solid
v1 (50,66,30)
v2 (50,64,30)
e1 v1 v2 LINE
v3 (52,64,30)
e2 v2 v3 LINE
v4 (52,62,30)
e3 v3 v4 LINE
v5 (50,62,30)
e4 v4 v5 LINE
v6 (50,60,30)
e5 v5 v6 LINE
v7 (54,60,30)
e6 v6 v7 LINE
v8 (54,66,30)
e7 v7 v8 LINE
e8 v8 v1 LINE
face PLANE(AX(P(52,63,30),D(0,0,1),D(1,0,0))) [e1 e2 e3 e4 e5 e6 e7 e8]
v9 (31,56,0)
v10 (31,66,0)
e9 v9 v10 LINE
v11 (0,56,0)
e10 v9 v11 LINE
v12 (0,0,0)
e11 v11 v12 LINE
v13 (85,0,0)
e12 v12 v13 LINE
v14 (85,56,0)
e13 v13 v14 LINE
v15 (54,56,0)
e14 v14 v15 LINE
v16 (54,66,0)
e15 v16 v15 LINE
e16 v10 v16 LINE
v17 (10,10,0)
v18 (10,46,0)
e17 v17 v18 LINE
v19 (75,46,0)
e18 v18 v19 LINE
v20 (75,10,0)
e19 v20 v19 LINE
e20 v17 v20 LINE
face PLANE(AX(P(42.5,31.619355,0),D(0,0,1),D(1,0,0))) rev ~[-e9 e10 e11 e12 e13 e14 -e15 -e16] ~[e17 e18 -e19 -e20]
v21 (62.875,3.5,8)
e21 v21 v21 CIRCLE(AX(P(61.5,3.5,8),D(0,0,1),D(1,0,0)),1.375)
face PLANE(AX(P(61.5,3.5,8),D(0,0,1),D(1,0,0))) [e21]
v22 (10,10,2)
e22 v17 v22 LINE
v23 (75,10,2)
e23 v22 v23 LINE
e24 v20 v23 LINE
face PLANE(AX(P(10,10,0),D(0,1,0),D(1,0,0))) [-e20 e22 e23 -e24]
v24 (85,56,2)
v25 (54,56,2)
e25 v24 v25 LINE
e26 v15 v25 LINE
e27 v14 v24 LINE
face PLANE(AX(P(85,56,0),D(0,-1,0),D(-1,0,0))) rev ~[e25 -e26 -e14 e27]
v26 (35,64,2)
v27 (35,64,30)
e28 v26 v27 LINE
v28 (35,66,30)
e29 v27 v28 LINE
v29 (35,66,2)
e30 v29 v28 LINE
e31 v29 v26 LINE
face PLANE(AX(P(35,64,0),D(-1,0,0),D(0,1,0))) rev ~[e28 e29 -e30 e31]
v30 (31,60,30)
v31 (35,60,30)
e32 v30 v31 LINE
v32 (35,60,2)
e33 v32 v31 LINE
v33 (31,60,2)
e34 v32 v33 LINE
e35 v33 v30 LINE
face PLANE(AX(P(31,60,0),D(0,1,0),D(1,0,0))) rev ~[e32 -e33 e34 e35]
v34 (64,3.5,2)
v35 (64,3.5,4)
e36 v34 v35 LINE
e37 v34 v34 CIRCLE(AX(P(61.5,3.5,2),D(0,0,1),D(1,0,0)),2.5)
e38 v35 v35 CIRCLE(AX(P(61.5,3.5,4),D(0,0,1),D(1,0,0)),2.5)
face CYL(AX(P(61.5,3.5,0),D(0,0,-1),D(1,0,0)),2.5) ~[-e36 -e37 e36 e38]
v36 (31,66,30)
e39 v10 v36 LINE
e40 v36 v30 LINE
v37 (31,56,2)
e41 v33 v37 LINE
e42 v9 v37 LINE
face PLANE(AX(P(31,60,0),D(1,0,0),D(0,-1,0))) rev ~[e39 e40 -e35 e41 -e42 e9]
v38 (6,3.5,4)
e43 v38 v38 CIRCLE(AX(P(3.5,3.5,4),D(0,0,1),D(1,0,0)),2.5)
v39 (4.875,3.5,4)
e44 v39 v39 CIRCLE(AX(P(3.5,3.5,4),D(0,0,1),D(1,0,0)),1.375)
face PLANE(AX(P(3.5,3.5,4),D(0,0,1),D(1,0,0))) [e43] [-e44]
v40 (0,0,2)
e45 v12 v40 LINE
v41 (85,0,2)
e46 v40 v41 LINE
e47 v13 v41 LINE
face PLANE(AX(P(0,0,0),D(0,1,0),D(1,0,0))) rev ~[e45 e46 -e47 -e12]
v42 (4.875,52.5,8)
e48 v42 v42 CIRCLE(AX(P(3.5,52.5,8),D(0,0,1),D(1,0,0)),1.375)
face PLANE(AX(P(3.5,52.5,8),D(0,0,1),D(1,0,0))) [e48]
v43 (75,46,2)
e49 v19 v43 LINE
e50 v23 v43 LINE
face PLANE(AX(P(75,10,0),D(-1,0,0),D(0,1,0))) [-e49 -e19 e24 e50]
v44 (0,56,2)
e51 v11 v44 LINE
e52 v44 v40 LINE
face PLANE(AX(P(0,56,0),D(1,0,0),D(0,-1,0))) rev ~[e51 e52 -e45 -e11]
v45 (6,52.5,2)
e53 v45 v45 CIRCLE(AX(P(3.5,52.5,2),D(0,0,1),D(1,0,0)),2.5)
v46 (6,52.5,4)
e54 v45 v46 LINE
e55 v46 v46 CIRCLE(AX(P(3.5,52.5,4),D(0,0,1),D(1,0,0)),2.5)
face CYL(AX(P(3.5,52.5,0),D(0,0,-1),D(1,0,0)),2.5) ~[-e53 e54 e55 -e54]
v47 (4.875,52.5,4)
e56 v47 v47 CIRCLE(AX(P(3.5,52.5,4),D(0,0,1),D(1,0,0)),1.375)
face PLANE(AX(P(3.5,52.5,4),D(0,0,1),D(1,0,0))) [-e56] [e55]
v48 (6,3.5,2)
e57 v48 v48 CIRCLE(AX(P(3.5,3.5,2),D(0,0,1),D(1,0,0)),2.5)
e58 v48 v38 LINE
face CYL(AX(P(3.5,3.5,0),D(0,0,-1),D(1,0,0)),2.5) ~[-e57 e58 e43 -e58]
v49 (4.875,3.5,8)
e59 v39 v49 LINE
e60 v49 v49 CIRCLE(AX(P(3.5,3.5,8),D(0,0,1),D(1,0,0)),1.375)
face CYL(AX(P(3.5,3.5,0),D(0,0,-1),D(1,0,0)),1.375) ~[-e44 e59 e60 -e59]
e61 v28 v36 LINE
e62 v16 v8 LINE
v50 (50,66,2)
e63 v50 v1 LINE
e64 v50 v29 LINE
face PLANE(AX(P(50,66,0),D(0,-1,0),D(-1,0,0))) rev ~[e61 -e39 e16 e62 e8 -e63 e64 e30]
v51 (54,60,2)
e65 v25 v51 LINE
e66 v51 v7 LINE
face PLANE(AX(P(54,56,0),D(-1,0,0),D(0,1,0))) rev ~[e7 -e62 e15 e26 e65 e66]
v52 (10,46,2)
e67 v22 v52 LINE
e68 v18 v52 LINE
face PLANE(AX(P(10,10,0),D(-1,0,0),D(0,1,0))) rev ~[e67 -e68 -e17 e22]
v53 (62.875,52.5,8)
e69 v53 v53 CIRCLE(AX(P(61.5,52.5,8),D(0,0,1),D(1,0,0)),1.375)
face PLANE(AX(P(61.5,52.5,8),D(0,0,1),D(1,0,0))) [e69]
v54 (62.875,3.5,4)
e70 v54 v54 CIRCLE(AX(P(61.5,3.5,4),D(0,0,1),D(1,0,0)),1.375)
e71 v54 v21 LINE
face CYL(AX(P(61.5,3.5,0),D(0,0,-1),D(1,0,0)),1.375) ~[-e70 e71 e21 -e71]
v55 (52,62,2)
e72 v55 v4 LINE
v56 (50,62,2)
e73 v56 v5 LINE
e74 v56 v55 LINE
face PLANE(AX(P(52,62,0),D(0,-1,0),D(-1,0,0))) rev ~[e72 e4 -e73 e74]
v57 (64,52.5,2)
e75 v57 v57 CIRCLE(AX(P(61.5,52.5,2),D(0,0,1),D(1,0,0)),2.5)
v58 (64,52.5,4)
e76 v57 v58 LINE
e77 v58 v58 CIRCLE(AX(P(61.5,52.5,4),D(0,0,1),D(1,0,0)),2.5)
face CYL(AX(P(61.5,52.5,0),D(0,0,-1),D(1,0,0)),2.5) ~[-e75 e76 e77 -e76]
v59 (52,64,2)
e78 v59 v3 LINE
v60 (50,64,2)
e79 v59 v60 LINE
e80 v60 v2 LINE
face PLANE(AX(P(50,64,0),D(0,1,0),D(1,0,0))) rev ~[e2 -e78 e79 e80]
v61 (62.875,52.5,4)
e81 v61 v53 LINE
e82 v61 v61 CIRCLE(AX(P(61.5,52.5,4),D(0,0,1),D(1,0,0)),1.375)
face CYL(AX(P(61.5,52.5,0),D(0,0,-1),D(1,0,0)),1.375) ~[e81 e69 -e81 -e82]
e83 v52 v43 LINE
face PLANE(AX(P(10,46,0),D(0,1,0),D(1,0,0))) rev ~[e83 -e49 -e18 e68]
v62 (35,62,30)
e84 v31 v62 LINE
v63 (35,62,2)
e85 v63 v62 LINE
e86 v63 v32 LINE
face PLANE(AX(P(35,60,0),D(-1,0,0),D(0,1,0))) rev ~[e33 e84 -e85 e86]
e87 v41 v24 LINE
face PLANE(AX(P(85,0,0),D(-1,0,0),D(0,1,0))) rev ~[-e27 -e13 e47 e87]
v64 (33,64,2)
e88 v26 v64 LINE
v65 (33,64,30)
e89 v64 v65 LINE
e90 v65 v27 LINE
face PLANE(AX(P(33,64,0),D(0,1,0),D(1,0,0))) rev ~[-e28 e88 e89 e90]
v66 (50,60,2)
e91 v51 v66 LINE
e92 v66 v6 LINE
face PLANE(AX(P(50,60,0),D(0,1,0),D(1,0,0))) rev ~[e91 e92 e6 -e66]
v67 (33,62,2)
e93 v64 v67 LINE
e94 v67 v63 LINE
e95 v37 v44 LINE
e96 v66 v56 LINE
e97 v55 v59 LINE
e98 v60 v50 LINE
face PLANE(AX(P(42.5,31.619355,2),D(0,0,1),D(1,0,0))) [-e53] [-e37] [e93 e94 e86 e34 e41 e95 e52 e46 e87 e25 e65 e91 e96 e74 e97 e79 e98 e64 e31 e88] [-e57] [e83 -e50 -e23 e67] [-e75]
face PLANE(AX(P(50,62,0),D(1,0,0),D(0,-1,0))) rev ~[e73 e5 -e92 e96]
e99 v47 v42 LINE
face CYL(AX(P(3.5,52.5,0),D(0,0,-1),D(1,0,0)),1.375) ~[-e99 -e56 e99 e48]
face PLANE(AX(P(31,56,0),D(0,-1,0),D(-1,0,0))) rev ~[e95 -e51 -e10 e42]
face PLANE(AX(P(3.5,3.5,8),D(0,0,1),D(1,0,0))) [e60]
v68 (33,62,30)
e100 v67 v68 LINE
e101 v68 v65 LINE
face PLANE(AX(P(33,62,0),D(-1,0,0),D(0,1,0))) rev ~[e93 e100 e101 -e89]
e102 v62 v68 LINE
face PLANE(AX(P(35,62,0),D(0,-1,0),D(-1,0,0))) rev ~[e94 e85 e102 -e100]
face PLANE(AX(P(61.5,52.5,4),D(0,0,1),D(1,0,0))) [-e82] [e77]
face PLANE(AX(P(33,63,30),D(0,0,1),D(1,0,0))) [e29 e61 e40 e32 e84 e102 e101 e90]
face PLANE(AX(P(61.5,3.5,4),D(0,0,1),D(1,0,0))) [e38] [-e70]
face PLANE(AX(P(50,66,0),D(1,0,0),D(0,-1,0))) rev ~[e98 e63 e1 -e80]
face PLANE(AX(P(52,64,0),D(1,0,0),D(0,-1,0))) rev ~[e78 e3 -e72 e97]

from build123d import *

# Parameters (mm, degrees)
F1_DEPTH = 30
F0_R     = 2.5
F0_R_2   = 1.375
F2_DEPTH = 4
F3_DEPTH = 8
F0_W     = 65
F0_H     = 36
F4_DEPTH = 2


with BuildPart() as f1:
    # F0 (on Top) → F1 (new body)
    with BuildSketch(Plane.XY):
        Polygon((31, 66), (31, 60), (35, 60), (35, 62), (33, 62), (33, 64), (35, 64), (35, 66), align=None)
    extrude(amount=F1_DEPTH)



with BuildPart() as f1b:
    # F0 (on Top) → F1, piece 2 (new body)
    with BuildSketch(Plane.XY):
        Polygon((50, 60), (54, 60), (54, 66), (50, 66), (50, 64), (52, 64), (52, 62), (50, 62), align=None)
    extrude(amount=F1_DEPTH)


with BuildPart() as f2:
    # F0 (on Top) → F2 (new body)
    with BuildSketch(Plane.XY):
        with Locations((3.5, 52.5)):
            Circle(F0_R)
        with Locations((3.5, 52.5)):
            Circle(F0_R_2, mode=Mode.SUBTRACT)
    extrude(amount=F2_DEPTH)

    # F0 (on Top) → F3 (join)
    with BuildSketch(Plane.XY):
        with Locations((3.5, 52.5)):
            Circle(F0_R_2)
    extrude(amount=F3_DEPTH)


with BuildPart() as f2b:
    # F0 (on Top) → F2, piece 2 (new body)
    with BuildSketch(Plane.XY):
        with Locations((61.5, 52.5)):
            Circle(F0_R)
        with Locations((61.5, 52.5)):
            Circle(F0_R_2, mode=Mode.SUBTRACT)
    extrude(amount=F2_DEPTH)

    # F0 (on Top) → F3, piece 2 (join)
    with BuildSketch(Plane.XY):
        with Locations((61.5, 52.5)):
            Circle(F0_R_2)
    extrude(amount=F3_DEPTH)


with BuildPart() as f2c:
    # F0 (on Top) → F2, piece 3 (new body)
    with BuildSketch(Plane.XY):
        with Locations((61.5, 3.5)):
            Circle(F0_R)
        with Locations((61.5, 3.5)):
            Circle(F0_R_2, mode=Mode.SUBTRACT)
    extrude(amount=F2_DEPTH)

    # F0 (on Top) → F3, piece 3 (join)
    with BuildSketch(Plane.XY):
        with Locations((61.5, 3.5)):
            Circle(F0_R_2)
    extrude(amount=F3_DEPTH)


with BuildPart() as f2d:
    # F0 (on Top) → F2, piece 4 (new body)
    with BuildSketch(Plane.XY):
        with Locations((3.5, 3.5)):
            Circle(F0_R)
        with Locations((3.5, 3.5)):
            Circle(F0_R_2, mode=Mode.SUBTRACT)
    extrude(amount=F2_DEPTH)

    # F0 (on Top) → F3, piece 4 (join)
    with BuildSketch(Plane.XY):
        with Locations((3.5, 3.5)):
            Circle(F0_R_2)
    extrude(amount=F3_DEPTH)


with BuildPart() as f1_1:
    add(f1.part)

    add(f1b.part)  # F4 merges F1b

    add(f2.part)  # F4 merges F2

    add(f2b.part)  # F4 merges F2b

    add(f2c.part)  # F4 merges F2c

    add(f2d.part)  # F4 merges F2d
    # F0 (on Top) → F4 (join)
    with BuildSketch(Plane.XY):
        Polygon((0, 28), (0, 0), (85, 0), (85, 28), (85, 56), (54, 56), (54, 60), (50, 60), (50, 62), (52, 62), (52, 64), (50, 64), (50, 66), (35, 66), (35, 64), (33, 64), (33, 62), (35, 62), (35, 60), (31, 60), (31, 56), (0, 56), align=None)
        with Locations((3.5, 3.5)):
            Circle(F0_R, mode=Mode.SUBTRACT)
        with Locations((61.5, 3.5)):
            Circle(F0_R, mode=Mode.SUBTRACT)
        with Locations((42.5, 28)):
            Rectangle(F0_W, F0_H, mode=Mode.SUBTRACT)
        with Locations((3.5, 52.5)):
            Circle(F0_R, mode=Mode.SUBTRACT)
        with Locations((61.5, 52.5)):
            Circle(F0_R, mode=Mode.SUBTRACT)
    extrude(amount=F4_DEPTH)


solid = f1_1.part
